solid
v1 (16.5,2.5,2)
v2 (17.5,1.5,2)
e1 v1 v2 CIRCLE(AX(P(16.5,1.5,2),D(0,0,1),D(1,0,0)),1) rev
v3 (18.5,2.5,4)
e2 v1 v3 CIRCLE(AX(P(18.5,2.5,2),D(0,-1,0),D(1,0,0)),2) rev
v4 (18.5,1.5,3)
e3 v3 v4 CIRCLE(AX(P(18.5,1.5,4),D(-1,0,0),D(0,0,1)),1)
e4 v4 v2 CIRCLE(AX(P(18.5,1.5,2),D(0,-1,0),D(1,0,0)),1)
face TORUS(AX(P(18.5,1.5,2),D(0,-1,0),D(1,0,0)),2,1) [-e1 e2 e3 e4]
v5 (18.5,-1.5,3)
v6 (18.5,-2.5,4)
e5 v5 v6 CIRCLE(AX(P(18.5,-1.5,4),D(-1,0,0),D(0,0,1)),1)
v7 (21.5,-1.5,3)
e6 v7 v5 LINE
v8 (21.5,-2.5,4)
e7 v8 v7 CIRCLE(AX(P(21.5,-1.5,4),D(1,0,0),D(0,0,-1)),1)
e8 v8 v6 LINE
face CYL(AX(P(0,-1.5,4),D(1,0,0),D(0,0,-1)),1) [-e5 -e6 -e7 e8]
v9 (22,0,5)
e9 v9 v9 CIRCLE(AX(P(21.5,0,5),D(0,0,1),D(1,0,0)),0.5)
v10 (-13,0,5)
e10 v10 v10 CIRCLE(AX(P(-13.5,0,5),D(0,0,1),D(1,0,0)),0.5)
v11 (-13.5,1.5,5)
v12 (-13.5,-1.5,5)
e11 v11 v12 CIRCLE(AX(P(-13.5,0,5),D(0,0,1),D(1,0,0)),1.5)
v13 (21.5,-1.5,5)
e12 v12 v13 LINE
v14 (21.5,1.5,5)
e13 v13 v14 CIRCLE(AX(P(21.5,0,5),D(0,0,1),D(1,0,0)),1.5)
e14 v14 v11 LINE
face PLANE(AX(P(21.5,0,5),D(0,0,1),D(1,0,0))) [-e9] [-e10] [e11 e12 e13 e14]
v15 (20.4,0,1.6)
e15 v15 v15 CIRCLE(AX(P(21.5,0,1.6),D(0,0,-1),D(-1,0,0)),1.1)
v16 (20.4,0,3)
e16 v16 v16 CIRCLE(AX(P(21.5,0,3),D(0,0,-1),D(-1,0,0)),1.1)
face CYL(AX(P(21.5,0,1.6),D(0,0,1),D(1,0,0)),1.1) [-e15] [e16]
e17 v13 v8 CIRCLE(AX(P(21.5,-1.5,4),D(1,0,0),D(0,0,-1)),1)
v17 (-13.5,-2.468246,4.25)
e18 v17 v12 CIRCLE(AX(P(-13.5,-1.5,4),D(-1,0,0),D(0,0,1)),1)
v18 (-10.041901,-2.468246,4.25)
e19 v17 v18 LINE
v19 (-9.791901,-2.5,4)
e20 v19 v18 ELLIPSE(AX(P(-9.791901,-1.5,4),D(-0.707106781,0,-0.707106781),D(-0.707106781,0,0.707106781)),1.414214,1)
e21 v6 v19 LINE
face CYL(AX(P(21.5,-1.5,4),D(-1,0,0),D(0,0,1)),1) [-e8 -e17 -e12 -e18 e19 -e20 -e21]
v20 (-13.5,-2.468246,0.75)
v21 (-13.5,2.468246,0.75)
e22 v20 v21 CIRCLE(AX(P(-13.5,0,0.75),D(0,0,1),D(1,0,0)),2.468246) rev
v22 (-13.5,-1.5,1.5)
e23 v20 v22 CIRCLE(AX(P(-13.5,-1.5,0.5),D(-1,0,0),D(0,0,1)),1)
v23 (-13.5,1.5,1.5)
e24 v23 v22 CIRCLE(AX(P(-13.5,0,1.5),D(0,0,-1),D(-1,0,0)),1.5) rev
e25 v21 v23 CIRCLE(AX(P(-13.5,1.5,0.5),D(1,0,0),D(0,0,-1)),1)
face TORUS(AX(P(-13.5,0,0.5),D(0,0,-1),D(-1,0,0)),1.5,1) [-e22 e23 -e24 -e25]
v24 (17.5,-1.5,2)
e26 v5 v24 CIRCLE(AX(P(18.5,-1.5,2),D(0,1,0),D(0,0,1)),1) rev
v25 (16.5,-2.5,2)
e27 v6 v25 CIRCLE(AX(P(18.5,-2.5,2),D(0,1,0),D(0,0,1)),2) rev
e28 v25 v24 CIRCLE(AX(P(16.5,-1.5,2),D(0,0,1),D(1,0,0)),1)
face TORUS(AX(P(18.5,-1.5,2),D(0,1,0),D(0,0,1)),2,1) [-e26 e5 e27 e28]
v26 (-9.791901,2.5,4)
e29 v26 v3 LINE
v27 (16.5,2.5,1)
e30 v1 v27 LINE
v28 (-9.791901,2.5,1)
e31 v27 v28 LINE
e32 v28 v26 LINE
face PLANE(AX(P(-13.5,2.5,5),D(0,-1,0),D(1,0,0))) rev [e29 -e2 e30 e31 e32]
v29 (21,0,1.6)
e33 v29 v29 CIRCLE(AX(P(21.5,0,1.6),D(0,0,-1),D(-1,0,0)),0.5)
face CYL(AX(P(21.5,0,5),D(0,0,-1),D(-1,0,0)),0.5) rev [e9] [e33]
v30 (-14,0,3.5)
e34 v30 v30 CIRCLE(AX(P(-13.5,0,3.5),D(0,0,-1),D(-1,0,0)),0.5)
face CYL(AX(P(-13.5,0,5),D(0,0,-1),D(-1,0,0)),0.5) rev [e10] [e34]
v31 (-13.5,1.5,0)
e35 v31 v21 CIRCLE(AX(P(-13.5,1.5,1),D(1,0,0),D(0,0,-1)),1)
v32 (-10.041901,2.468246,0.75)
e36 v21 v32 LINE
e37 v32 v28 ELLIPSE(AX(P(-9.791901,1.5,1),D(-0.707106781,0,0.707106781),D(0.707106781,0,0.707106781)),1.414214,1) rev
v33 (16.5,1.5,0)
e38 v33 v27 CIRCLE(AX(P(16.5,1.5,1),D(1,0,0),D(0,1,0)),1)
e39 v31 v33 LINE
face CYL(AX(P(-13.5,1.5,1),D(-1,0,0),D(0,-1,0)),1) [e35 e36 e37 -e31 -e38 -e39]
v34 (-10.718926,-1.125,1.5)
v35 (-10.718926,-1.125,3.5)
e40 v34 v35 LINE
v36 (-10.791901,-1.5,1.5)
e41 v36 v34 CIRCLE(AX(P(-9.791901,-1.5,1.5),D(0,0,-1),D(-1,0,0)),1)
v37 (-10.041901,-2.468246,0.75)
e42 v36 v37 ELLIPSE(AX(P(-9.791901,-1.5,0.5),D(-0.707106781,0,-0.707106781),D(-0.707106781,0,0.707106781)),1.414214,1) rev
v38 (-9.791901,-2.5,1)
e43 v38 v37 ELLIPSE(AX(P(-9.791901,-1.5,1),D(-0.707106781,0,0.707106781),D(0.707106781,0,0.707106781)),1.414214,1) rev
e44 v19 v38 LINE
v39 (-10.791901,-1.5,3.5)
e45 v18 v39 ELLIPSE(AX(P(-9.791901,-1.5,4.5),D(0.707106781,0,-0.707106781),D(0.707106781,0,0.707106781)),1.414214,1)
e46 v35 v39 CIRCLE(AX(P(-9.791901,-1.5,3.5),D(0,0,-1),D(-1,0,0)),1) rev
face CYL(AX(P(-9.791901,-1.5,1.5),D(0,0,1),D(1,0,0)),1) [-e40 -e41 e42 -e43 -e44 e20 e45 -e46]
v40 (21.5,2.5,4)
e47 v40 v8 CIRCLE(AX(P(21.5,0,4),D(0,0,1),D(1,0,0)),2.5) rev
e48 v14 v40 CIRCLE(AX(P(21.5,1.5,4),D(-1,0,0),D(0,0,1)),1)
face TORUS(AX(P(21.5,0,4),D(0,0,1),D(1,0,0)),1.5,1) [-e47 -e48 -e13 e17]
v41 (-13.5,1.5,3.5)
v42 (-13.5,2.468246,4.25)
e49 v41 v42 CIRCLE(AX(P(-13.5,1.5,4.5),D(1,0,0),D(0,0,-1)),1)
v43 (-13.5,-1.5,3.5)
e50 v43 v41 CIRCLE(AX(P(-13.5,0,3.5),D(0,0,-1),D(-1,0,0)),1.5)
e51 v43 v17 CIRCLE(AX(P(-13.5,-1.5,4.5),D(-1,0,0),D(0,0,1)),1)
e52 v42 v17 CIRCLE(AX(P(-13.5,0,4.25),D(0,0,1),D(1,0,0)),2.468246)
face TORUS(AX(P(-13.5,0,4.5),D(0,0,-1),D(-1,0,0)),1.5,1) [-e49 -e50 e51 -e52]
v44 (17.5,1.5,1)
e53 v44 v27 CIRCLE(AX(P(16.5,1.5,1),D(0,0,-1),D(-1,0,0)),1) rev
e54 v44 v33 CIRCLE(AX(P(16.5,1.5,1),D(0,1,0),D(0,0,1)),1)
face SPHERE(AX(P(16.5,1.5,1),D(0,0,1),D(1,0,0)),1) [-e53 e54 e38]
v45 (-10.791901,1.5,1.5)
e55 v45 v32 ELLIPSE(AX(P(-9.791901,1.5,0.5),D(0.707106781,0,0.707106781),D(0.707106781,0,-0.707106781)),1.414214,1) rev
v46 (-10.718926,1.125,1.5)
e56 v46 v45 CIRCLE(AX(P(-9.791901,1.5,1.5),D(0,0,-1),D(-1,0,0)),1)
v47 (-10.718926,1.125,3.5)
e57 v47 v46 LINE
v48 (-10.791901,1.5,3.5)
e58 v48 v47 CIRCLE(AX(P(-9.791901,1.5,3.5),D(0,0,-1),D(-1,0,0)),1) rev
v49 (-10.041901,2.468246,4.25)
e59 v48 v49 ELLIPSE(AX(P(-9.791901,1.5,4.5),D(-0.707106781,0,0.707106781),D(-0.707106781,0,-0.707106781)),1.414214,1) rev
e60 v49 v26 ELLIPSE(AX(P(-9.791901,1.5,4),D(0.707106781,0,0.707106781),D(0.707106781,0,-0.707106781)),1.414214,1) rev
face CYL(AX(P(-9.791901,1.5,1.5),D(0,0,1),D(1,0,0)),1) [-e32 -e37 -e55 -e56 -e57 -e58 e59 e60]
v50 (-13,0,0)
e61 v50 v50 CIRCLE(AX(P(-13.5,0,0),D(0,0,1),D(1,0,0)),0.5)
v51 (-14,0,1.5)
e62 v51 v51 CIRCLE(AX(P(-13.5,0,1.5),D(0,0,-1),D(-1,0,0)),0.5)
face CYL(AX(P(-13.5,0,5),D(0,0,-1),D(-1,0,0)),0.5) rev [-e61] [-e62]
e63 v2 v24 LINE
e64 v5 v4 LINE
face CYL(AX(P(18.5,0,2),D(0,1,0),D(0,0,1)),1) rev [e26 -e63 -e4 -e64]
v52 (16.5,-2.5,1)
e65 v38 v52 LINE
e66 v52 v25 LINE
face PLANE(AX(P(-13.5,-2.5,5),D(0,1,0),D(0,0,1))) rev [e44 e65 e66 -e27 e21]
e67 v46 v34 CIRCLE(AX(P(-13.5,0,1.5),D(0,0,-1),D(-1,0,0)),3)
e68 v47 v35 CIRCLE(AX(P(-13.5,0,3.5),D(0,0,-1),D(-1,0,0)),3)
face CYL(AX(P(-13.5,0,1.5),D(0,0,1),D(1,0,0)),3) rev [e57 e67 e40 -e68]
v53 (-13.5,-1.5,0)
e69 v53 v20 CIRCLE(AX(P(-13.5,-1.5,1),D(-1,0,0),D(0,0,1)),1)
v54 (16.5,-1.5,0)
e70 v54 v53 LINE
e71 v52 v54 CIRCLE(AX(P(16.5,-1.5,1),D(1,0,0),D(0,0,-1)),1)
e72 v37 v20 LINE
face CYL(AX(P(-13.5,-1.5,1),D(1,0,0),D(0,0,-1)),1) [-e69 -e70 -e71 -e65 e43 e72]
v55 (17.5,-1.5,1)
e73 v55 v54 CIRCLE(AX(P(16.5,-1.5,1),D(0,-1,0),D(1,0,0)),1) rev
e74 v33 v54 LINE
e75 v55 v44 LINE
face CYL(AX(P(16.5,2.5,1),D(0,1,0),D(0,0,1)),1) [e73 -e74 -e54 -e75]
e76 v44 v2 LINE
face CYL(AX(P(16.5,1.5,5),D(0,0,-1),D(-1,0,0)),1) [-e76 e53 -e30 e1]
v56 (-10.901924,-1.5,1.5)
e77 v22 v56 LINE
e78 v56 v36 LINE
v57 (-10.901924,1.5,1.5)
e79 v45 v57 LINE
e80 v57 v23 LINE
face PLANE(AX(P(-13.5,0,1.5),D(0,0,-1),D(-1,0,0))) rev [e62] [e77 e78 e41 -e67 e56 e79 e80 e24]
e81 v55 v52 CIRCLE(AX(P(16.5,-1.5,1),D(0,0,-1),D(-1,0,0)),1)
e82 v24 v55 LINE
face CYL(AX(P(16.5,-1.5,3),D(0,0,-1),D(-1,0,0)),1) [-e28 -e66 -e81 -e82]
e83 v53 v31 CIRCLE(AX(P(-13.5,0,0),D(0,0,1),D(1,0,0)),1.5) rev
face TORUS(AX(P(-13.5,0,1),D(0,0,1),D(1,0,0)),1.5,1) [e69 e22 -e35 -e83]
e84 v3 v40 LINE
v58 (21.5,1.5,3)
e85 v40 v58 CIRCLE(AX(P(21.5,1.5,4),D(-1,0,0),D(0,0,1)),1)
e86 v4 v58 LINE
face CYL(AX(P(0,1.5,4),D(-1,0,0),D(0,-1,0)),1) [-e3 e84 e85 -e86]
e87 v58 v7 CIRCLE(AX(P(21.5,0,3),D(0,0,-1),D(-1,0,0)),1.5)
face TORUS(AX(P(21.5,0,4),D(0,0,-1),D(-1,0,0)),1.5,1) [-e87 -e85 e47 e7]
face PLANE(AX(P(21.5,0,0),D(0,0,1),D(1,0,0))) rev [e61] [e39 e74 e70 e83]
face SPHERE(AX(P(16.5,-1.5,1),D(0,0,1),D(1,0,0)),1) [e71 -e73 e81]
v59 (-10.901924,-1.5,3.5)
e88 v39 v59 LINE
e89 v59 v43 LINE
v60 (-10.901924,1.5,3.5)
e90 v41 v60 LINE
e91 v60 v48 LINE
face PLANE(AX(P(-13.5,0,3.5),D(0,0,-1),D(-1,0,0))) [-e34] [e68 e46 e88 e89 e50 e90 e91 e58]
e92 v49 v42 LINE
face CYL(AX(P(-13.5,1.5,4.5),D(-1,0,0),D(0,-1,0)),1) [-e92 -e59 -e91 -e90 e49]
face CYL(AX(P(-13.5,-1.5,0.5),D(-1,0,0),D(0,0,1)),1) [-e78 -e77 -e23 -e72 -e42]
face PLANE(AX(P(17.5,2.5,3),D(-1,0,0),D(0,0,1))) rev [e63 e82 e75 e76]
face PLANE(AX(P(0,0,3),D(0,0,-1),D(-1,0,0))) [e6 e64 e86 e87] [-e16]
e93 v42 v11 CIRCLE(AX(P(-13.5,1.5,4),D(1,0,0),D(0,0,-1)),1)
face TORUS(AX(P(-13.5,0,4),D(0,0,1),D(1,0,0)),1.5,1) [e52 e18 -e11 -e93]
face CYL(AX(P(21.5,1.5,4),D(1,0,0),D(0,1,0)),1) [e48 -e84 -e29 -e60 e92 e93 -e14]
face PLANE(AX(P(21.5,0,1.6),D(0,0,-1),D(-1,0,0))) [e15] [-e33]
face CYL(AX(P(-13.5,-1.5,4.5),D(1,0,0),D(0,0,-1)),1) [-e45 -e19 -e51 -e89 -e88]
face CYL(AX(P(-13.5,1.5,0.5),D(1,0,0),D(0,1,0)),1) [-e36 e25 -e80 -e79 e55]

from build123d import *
from build123d.topology import SkipClean

# Parameters (mm, degrees)
SKETCH_1_R               = 0.5
EXTRUDE_1_DEPTH          = 5
CUT_EXTRUDE_1_DEPTH      = 1
CUT_EXTRUDE_1_DEPTH_BACK = 1
CUT_EXTRUDE_1_START      = -2.5
SKETCH_2_R               = 3
SKETCH_7_W               = 8
SKETCH_7_H               = 5
CUT_EXTRUDE_3_DEPTH      = 3
EXTRUDE_START            = 1.4
SKETCH_8_R               = 1.1
SKETCH_8_R_2             = 0.5
EXTRUDE_3_DEPTH          = 1.4
FILLET_1_R               = 1


with BuildPart() as part:
    # 草图1 → 凸台-拉伸1 (new body)
    with BuildSketch(Plane.XY):
        with BuildLine():
            Line((-13.5, 2.5), (21.5, 2.5))
            ThreePointArc((21.5, 2.5), (24, 0), (21.5, -2.5))
            Line((21.5, -2.5), (-13.5, -2.5))
            ThreePointArc((-13.5, -2.5), (-16, 0), (-13.5, 2.5))
        make_face()
        with Locations((-13.5, 0)):
            Circle(SKETCH_1_R, mode=Mode.SUBTRACT)
        with Locations((21.5, 0)):
            Circle(SKETCH_1_R, mode=Mode.SUBTRACT)
    extrude(amount=EXTRUDE_1_DEPTH)

    # 草图2 → 切除-拉伸1 (cut, two sides: drawn at the far end of the back side and taken through both)
    with BuildSketch(Plane(origin=(0, 0, 0), x_dir=(-1, 0, 0), z_dir=(0, 0, -1)).offset(CUT_EXTRUDE_1_START - CUT_EXTRUDE_1_DEPTH_BACK)):
        with Locations((13.5, 0)):
            Circle(SKETCH_2_R)
    extrude(amount=CUT_EXTRUDE_1_DEPTH + CUT_EXTRUDE_1_DEPTH_BACK, mode=Mode.SUBTRACT)

    # 草图7 → 切除-拉伸3 (cut)
    with BuildSketch(Plane(origin=(0, 0, 0), x_dir=(-1, 0, 0), z_dir=(0, 0, -1))):
        with Locations((-21.5, 0)):
            Rectangle(SKETCH_7_W, SKETCH_7_H)
    extrude(amount=-CUT_EXTRUDE_3_DEPTH, mode=Mode.SUBTRACT)

    # 草图8 → 凸台-拉伸3 (add)
    with SkipClean():  # the faces are left unmerged after this step: merging them gives an invalid solid
        with BuildSketch(Plane(origin=(0, 0, 3), x_dir=(-1, 0, 0), z_dir=(0, 0, -1)).offset(EXTRUDE_START)):
            with Locations((-21.5, 0)):
                Circle(SKETCH_8_R)
            with Locations((-21.5, 0)):
                Circle(SKETCH_8_R_2, mode=Mode.SUBTRACT)
        extrude(amount=-EXTRUDE_3_DEPTH)

    # 圆角1
    # the kernel refuses this fillet: 1 mm, written as the material it adds along each edge
    with BuildSketch(Plane(origin=(17.5, 2.5, 3), x_dir=(1, 0, 0), z_dir=(0, -1, 0))) as fillet_1_piece_1:
        with BuildLine():
            CenterArc((FILLET_1_R, -FILLET_1_R), FILLET_1_R, 90, 90)
            Line((0, -FILLET_1_R), (-FILLET_1_R * 0.02, -FILLET_1_R))
            Line((-FILLET_1_R * 0.02, -FILLET_1_R), (-FILLET_1_R * 0.02, FILLET_1_R * 0.02))
            Line((-FILLET_1_R * 0.02, FILLET_1_R * 0.02), (FILLET_1_R, FILLET_1_R * 0.02))
            Line((FILLET_1_R, FILLET_1_R * 0.02), (FILLET_1_R, 0))
        make_face()
    extrude(amount=5)
    # the kernel refuses this fillet: 1 mm, written as the material it takes off along each edge
    with BuildSketch(Plane(origin=(-13.5, -2.5, 1.5), x_dir=(0, 0, -1), z_dir=(1, 0, 0))) as fillet_1_2_piece_1_section:
        with BuildLine():
            CenterArc((FILLET_1_R, FILLET_1_R), FILLET_1_R, 180, 90)
            Line((0, FILLET_1_R), (-FILLET_1_R * 0.02, FILLET_1_R))
            Line((-FILLET_1_R * 0.02, FILLET_1_R), (-FILLET_1_R * 0.02, -FILLET_1_R * 0.02))
            Line((-FILLET_1_R * 0.02, -FILLET_1_R * 0.02), (FILLET_1_R, -FILLET_1_R * 0.02))
            Line((FILLET_1_R, -FILLET_1_R * 0.02), (FILLET_1_R, 0))
        make_face()
    fillet_1_2_piece_1 = extrude(amount=4.158312395, mode=Mode.PRIVATE)
    fillet_1_2_piece_1 = fillet_1_2_piece_1 & Plane(origin=(-13.5, 0, 1.28947416), x_dir=(-1, 0, 0), z_dir=(0, 0, -1)) * Cylinder(3, 13, mode=Mode.PRIVATE)
    add(fillet_1_2_piece_1, mode=Mode.SUBTRACT)
    with BuildSketch(Plane(origin=(-9.341687605, 2.5, 1.5), x_dir=(0, 0, -1), z_dir=(-1, 0, 0))) as fillet_1_2_piece_2_section:
        with BuildLine():
            CenterArc((FILLET_1_R, FILLET_1_R), FILLET_1_R, 180, 90)
            Line((0, FILLET_1_R), (-FILLET_1_R * 0.02, FILLET_1_R))
            Line((-FILLET_1_R * 0.02, FILLET_1_R), (-FILLET_1_R * 0.02, -FILLET_1_R * 0.02))
            Line((-FILLET_1_R * 0.02, -FILLET_1_R * 0.02), (FILLET_1_R, -FILLET_1_R * 0.02))
            Line((FILLET_1_R, -FILLET_1_R * 0.02), (FILLET_1_R, 0))
        make_face()
    fillet_1_2_piece_2 = extrude(amount=4.158312395, mode=Mode.PRIVATE)
    fillet_1_2_piece_2 = fillet_1_2_piece_2 & Plane(origin=(-13.5, 0, 1.289475039), x_dir=(-1, 0, 0), z_dir=(0, 0, -1)) * Cylinder(3, 13, mode=Mode.PRIVATE)
    add(fillet_1_2_piece_2, mode=Mode.SUBTRACT)
    with BuildSketch(Plane(origin=(-13.5, -2.5, 3.5), x_dir=(0, 0, 1), z_dir=(1, 0, 0))) as fillet_1_2_piece_3_section:
        with BuildLine():
            CenterArc((FILLET_1_R, -FILLET_1_R), FILLET_1_R, 90, 90)
            Line((0, -FILLET_1_R), (-FILLET_1_R * 0.02, -FILLET_1_R))
            Line((-FILLET_1_R * 0.02, -FILLET_1_R), (-FILLET_1_R * 0.02, FILLET_1_R * 0.02))
            Line((-FILLET_1_R * 0.02, FILLET_1_R * 0.02), (FILLET_1_R, FILLET_1_R * 0.02))
            Line((FILLET_1_R, FILLET_1_R * 0.02), (FILLET_1_R, 0))
        make_face()
    fillet_1_2_piece_3 = extrude(amount=4.158312395, mode=Mode.PRIVATE)
    fillet_1_2_piece_3 = fillet_1_2_piece_3 & Plane(origin=(-13.5, 0, 3.71052584), x_dir=(-1, 0, 0), z_dir=(0, 0, -1)) * Cylinder(3, 13, mode=Mode.PRIVATE)
    add(fillet_1_2_piece_3, mode=Mode.SUBTRACT)
    with BuildSketch(Plane(origin=(-9.341687605, 2.5, 3.5), x_dir=(0, 0, 1), z_dir=(-1, 0, 0))) as fillet_1_2_piece_4_section:
        with BuildLine():
            CenterArc((FILLET_1_R, -FILLET_1_R), FILLET_1_R, 90, 90)
            Line((0, -FILLET_1_R), (-FILLET_1_R * 0.02, -FILLET_1_R))
            Line((-FILLET_1_R * 0.02, -FILLET_1_R), (-FILLET_1_R * 0.02, FILLET_1_R * 0.02))
            Line((-FILLET_1_R * 0.02, FILLET_1_R * 0.02), (FILLET_1_R, FILLET_1_R * 0.02))
            Line((FILLET_1_R, FILLET_1_R * 0.02), (FILLET_1_R, 0))
        make_face()
    fillet_1_2_piece_4 = extrude(amount=4.158312395, mode=Mode.PRIVATE)
    fillet_1_2_piece_4 = fillet_1_2_piece_4 & Plane(origin=(-13.5, 0, 3.710524961), x_dir=(-1, 0, 0), z_dir=(0, 0, -1)) * Cylinder(3, 13, mode=Mode.PRIVATE)
    add(fillet_1_2_piece_4, mode=Mode.SUBTRACT)
    with BuildSketch(Plane(origin=(-13.5, 0, 5), x_dir=(0, -1, 0), z_dir=(1, 0, 0))) as fillet_1_2_piece_5:
        with BuildLine():
            CenterArc((2.5 - FILLET_1_R, FILLET_1_R), FILLET_1_R, 270, 90)
            Line((2.5, FILLET_1_R), (2.5 + FILLET_1_R * 0.02, FILLET_1_R))
            Line((2.5 + FILLET_1_R * 0.02, FILLET_1_R), (2.5 + FILLET_1_R * 0.02, -FILLET_1_R * 0.02))
            Line((2.5 + FILLET_1_R * 0.02, -FILLET_1_R * 0.02), (2.5 - FILLET_1_R, -FILLET_1_R * 0.02))
            Line((2.5 - FILLET_1_R, -FILLET_1_R * 0.02), (2.5 - FILLET_1_R, 0))
        make_face()
    revolve(axis=Axis((-13.5, 0, 5), (0, 0, -1)), revolution_arc=180, mode=Mode.SUBTRACT)
    with BuildSketch(Plane(origin=(-13.5, 2.5, 5), x_dir=(0, -1, 0), z_dir=(1, 0, 0))) as fillet_1_2_piece_6:
        with BuildLine():
            CenterArc((FILLET_1_R, FILLET_1_R), FILLET_1_R, 180, 90)
            Line((0, FILLET_1_R), (-FILLET_1_R * 0.02, FILLET_1_R))
            Line((-FILLET_1_R * 0.02, FILLET_1_R), (-FILLET_1_R * 0.02, -FILLET_1_R * 0.02))
            Line((-FILLET_1_R * 0.02, -FILLET_1_R * 0.02), (FILLET_1_R, -FILLET_1_R * 0.02))
            Line((FILLET_1_R, -FILLET_1_R * 0.02), (FILLET_1_R, 0))
        make_face()
    extrude(amount=35, mode=Mode.SUBTRACT)
    with BuildSketch(Plane(origin=(21.5, 0, 5), x_dir=(0, 1, 0), z_dir=(-1, 0, 0))) as fillet_1_2_piece_7:
        with BuildLine():
            CenterArc((2.5 - FILLET_1_R, FILLET_1_R), FILLET_1_R, 270, 90)
            Line((2.5 - FILLET_1_R, 0), (2.5 - FILLET_1_R, -FILLET_1_R * 0.02))
            Line((2.5 - FILLET_1_R, -FILLET_1_R * 0.02), (2.5 + FILLET_1_R * 0.02, -FILLET_1_R * 0.02))
            Line((2.5 + FILLET_1_R * 0.02, -FILLET_1_R * 0.02), (2.5 + FILLET_1_R * 0.02, FILLET_1_R))
            Line((2.5 + FILLET_1_R * 0.02, FILLET_1_R), (2.5, FILLET_1_R))
        make_face()
    revolve(axis=Axis((21.5, 0, 5), (0, 0, -1)), revolution_arc=180, mode=Mode.SUBTRACT)
    with BuildSketch(Plane(origin=(-13.5, 2.5, 0), x_dir=(0, 0, 1), z_dir=(1, 0, 0)), Plane(origin=(17.5, -2.5, 0), x_dir=(0, 0, 1), z_dir=(-1, 0, 0))) as fillet_1_2_piece_8:
        with BuildLine():
            CenterArc((FILLET_1_R, FILLET_1_R), FILLET_1_R, 180, 90)
            Line((0, FILLET_1_R), (-FILLET_1_R * 0.02, FILLET_1_R))
            Line((-FILLET_1_R * 0.02, FILLET_1_R), (-FILLET_1_R * 0.02, -FILLET_1_R * 0.02))
            Line((-FILLET_1_R * 0.02, -FILLET_1_R * 0.02), (FILLET_1_R, -FILLET_1_R * 0.02))
            Line((FILLET_1_R, -FILLET_1_R * 0.02), (FILLET_1_R, 0))
        make_face()
    extrude(amount=31, mode=Mode.SUBTRACT)
    with BuildSketch(Plane(origin=(-13.5, 0, 0), x_dir=(0, -1, 0), z_dir=(1, 0, 0))) as fillet_1_2_piece_9:
        with BuildLine():
            CenterArc((2.5 - FILLET_1_R, -FILLET_1_R), FILLET_1_R, 0, 90)
            Line((2.5, -FILLET_1_R), (2.5 + FILLET_1_R * 0.02, -FILLET_1_R))
            Line((2.5 + FILLET_1_R * 0.02, -FILLET_1_R), (2.5 + FILLET_1_R * 0.02, FILLET_1_R * 0.02))
            Line((2.5 + FILLET_1_R * 0.02, FILLET_1_R * 0.02), (2.5 - FILLET_1_R, FILLET_1_R * 0.02))
            Line((2.5 - FILLET_1_R, FILLET_1_R * 0.02), (2.5 - FILLET_1_R, 0))
        make_face()
    revolve(axis=Axis((-13.5, 0, 0), (0, 0, -1)), revolution_arc=180, mode=Mode.SUBTRACT)
    with BuildSketch(Plane(origin=(-13.5, 0, 1.5), x_dir=(0, -1, 0), z_dir=(1, 0, 0))) as fillet_1_2_piece_10:
        with BuildLine():
            CenterArc((2.5 - FILLET_1_R, FILLET_1_R), FILLET_1_R, 270, 90)
            Line((2.5 - FILLET_1_R, 0), (2.5 - FILLET_1_R, -FILLET_1_R * 0.02))
            Line((2.5 - FILLET_1_R, -FILLET_1_R * 0.02), (2.5 + FILLET_1_R * 0.02, -FILLET_1_R * 0.02))
            Line((2.5 + FILLET_1_R * 0.02, -FILLET_1_R * 0.02), (2.5 + FILLET_1_R * 0.02, FILLET_1_R))
            Line((2.5 + FILLET_1_R * 0.02, FILLET_1_R), (2.5, FILLET_1_R))
        make_face()
    revolve(axis=Axis((-13.5, 0, 1.5), (0, 0, -1)), revolution_arc=180, mode=Mode.SUBTRACT)
    with BuildSketch(Plane(origin=(-13.5, 0, 3.5), x_dir=(0, -1, 0), z_dir=(1, 0, 0))) as fillet_1_2_piece_11:
        with BuildLine():
            CenterArc((2.5 - FILLET_1_R, -FILLET_1_R), FILLET_1_R, 0, 90)
            Line((2.5, -FILLET_1_R), (2.5 + FILLET_1_R * 0.02, -FILLET_1_R))
            Line((2.5 + FILLET_1_R * 0.02, -FILLET_1_R), (2.5 + FILLET_1_R * 0.02, FILLET_1_R * 0.02))
            Line((2.5 + FILLET_1_R * 0.02, FILLET_1_R * 0.02), (2.5 - FILLET_1_R, FILLET_1_R * 0.02))
            Line((2.5 - FILLET_1_R, FILLET_1_R * 0.02), (2.5 - FILLET_1_R, 0))
        make_face()
    revolve(axis=Axis((-13.5, 0, 3.5), (0, 0, -1)), revolution_arc=180, mode=Mode.SUBTRACT)
    with BuildSketch(Plane(origin=(-11.841687605, 2.5, 1.5), x_dir=(1, 0, 0), z_dir=(0, 0, 1)), Plane(origin=(-11.841687605, -2.5, 3.5), x_dir=(1, 0, 0), z_dir=(0, 0, -1))) as fillet_1_2_piece_12:
        with BuildLine():
            CenterArc((2.049786848, -1), FILLET_1_R, 90, 112.024312837)
            Line((1.122762037, -1.375), (1.104221541, -1.3825))
            ThreePointArc((1.104221541, -1.3825), (0.649920512, -0.615202704), (-0.011055416, -0.016666667))
            Line((-0.011055416, -0.016666667), (0, 0.02))
            Line((0, 0.02), (2.049786848, 0.02))
            Line((2.049786848, 0.02), (2.049786848, 0))
        make_face()
    extrude(amount=2, mode=Mode.SUBTRACT)
    with BuildSketch(Plane(origin=(21.5, -2.5, 5), x_dir=(0, 0, -1), z_dir=(-1, 0, 0))) as fillet_1_2_piece_13:
        with BuildLine():
            CenterArc((FILLET_1_R, -FILLET_1_R), FILLET_1_R, 90, 90)
            Line((0, -FILLET_1_R), (-FILLET_1_R * 0.02, -FILLET_1_R))
            Line((-FILLET_1_R * 0.02, -FILLET_1_R), (-FILLET_1_R * 0.02, FILLET_1_R * 0.02))
            Line((-FILLET_1_R * 0.02, FILLET_1_R * 0.02), (FILLET_1_R, FILLET_1_R * 0.02))
            Line((FILLET_1_R, FILLET_1_R * 0.02), (FILLET_1_R, 0))
        make_face()
    extrude(amount=35, mode=Mode.SUBTRACT)
    with BuildSketch(Plane(origin=(17.5, 2.5, 0), x_dir=(-1, 0, 0), z_dir=(0, -1, 0))) as fillet_1_2_piece_14:
        with BuildLine():
            CenterArc((FILLET_1_R, -FILLET_1_R), FILLET_1_R, 90, 90)
            Line((0, -FILLET_1_R), (-FILLET_1_R * 0.02, -FILLET_1_R))
            Line((-FILLET_1_R * 0.02, -FILLET_1_R), (-FILLET_1_R * 0.02, FILLET_1_R * 0.02))
            Line((-FILLET_1_R * 0.02, FILLET_1_R * 0.02), (FILLET_1_R, FILLET_1_R * 0.02))
            Line((FILLET_1_R, FILLET_1_R * 0.02), (FILLET_1_R, 0))
        make_face()
    extrude(amount=5, mode=Mode.SUBTRACT)
    with BuildSketch(Plane(origin=(-13.5, -2.5, 1.5), x_dir=(0, 0, -1), z_dir=(1, 0, 0))) as fillet_1_2_piece_15a_section:
        with BuildLine():
            CenterArc((FILLET_1_R, FILLET_1_R), FILLET_1_R, 180, 90)
            Line((0, FILLET_1_R), (-FILLET_1_R * 0.02, FILLET_1_R))
            Line((-FILLET_1_R * 0.02, FILLET_1_R), (-FILLET_1_R * 0.02, -FILLET_1_R * 0.02))
            Line((-FILLET_1_R * 0.02, -FILLET_1_R * 0.02), (FILLET_1_R, -FILLET_1_R * 0.02))
            Line((FILLET_1_R, -FILLET_1_R * 0.02), (FILLET_1_R, 0))
        make_face()
    fillet_1_2_piece_15a = extrude(amount=4.158312395, mode=Mode.PRIVATE)
    fillet_1_2_piece_15a = fillet_1_2_piece_15a - Plane(origin=(-13.5, 0, 1.259839383), x_dir=(-1, 0, 0), z_dir=(0, 0, -1)) * Cylinder(3, 13, mode=Mode.PRIVATE)
    with BuildSketch(Plane(origin=(-11.841687605, -2.5, 3.5), x_dir=(1, 0, 0), z_dir=(0, 0, -1))) as fillet_1_2_piece_15b_section:
        with BuildLine():
            CenterArc((2.049786848, -1), FILLET_1_R, 90, 112.024312837)
            Line((1.122762037, -1.375), (1.104221541, -1.3825))
            ThreePointArc((1.104221541, -1.3825), (0.649920512, -0.615202704), (-0.011055416, -0.016666667))
            Line((-0.011055416, -0.016666667), (0, 0.02))
            Line((0, 0.02), (2.049786848, 0.02))
            Line((2.049786848, 0.02), (2.049786848, 0))
        make_face()
    fillet_1_2_piece_15b = extrude(amount=7.124467121, mode=Mode.PRIVATE)
    fillet_1_2_piece_15b = split(fillet_1_2_piece_15b, bisect_by=Plane(origin=(-10.955873781, -2.177051109, 1.5), z_dir=(0, 0, -1)), keep=Keep.TOP, mode=Mode.PRIVATE)
    fillet_1_2_piece_15 = fillet_1_2_piece_15a & fillet_1_2_piece_15b
    add(fillet_1_2_piece_15, mode=Mode.SUBTRACT)
    with BuildSketch(Plane(origin=(-11.841687605, 2.5, -3.624467121), x_dir=(1, 0, 0), z_dir=(0, 0, 1))) as fillet_1_2_piece_16a_section:
        with BuildLine():
            CenterArc((2.049786848, -1), FILLET_1_R, 90, 112.024312837)
            Line((1.122762037, -1.375), (1.104221541, -1.3825))
            ThreePointArc((1.104221541, -1.3825), (0.649920512, -0.615202704), (-0.011055416, -0.016666667))
            Line((-0.011055416, -0.016666667), (0, 0.02))
            Line((0, 0.02), (2.049786848, 0.02))
            Line((2.049786848, 0.02), (2.049786848, 0))
        make_face()
    fillet_1_2_piece_16a = extrude(amount=7.124467121, mode=Mode.PRIVATE)
    fillet_1_2_piece_16a = split(fillet_1_2_piece_16a, bisect_by=Plane(origin=(-10.955873781, 2.177051109, 1.5), z_dir=(0, 0, -1)), keep=Keep.TOP, mode=Mode.PRIVATE)
    with BuildSketch(Plane(origin=(-9.341687605, 2.5, 1.5), x_dir=(0, 0, -1), z_dir=(-1, 0, 0))) as fillet_1_2_piece_16b_section:
        with BuildLine():
            CenterArc((FILLET_1_R, FILLET_1_R), FILLET_1_R, 180, 90)
            Line((0, FILLET_1_R), (-FILLET_1_R * 0.02, FILLET_1_R))
            Line((-FILLET_1_R * 0.02, FILLET_1_R), (-FILLET_1_R * 0.02, -FILLET_1_R * 0.02))
            Line((-FILLET_1_R * 0.02, -FILLET_1_R * 0.02), (FILLET_1_R, -FILLET_1_R * 0.02))
            Line((FILLET_1_R, -FILLET_1_R * 0.02), (FILLET_1_R, 0))
        make_face()
    fillet_1_2_piece_16b = extrude(amount=4.158312395, mode=Mode.PRIVATE)
    fillet_1_2_piece_16b = fillet_1_2_piece_16b - Plane(origin=(-13.5, 0, 1.259838183), x_dir=(-1, 0, 0), z_dir=(0, 0, -1)) * Cylinder(3, 13, mode=Mode.PRIVATE)
    fillet_1_2_piece_16 = fillet_1_2_piece_16a & fillet_1_2_piece_16b
    add(fillet_1_2_piece_16, mode=Mode.SUBTRACT)
    with BuildSketch(Plane(origin=(-11.841687605, -2.5, 8.624467121), x_dir=(1, 0, 0), z_dir=(0, 0, -1))) as fillet_1_2_piece_17a_section:
        with BuildLine():
            CenterArc((2.049786848, -1), FILLET_1_R, 90, 112.024312837)
            Line((1.122762037, -1.375), (1.104221541, -1.3825))
            ThreePointArc((1.104221541, -1.3825), (0.649920512, -0.615202704), (-0.011055416, -0.016666667))
            Line((-0.011055416, -0.016666667), (0, 0.02))
            Line((0, 0.02), (2.049786848, 0.02))
            Line((2.049786848, 0.02), (2.049786848, 0))
        make_face()
    fillet_1_2_piece_17a = extrude(amount=7.124467121, mode=Mode.PRIVATE)
    fillet_1_2_piece_17a = split(fillet_1_2_piece_17a, bisect_by=Plane(origin=(-10.955873781, -2.177051109, 3.5), z_dir=(0, 0, 1)), keep=Keep.TOP, mode=Mode.PRIVATE)
    with BuildSketch(Plane(origin=(-13.5, -2.5, 3.5), x_dir=(0, 0, 1), z_dir=(1, 0, 0))) as fillet_1_2_piece_17b_section:
        with BuildLine():
            CenterArc((FILLET_1_R, -FILLET_1_R), FILLET_1_R, 90, 90)
            Line((0, -FILLET_1_R), (-FILLET_1_R * 0.02, -FILLET_1_R))
            Line((-FILLET_1_R * 0.02, -FILLET_1_R), (-FILLET_1_R * 0.02, FILLET_1_R * 0.02))
            Line((-FILLET_1_R * 0.02, FILLET_1_R * 0.02), (FILLET_1_R, FILLET_1_R * 0.02))
            Line((FILLET_1_R, FILLET_1_R * 0.02), (FILLET_1_R, 0))
        make_face()
    fillet_1_2_piece_17b = extrude(amount=4.158312395, mode=Mode.PRIVATE)
    fillet_1_2_piece_17b = fillet_1_2_piece_17b - Plane(origin=(-13.5, 0, 3.740160617), x_dir=(-1, 0, 0), z_dir=(0, 0, -1)) * Cylinder(3, 13, mode=Mode.PRIVATE)
    fillet_1_2_piece_17 = fillet_1_2_piece_17a & fillet_1_2_piece_17b
    add(fillet_1_2_piece_17, mode=Mode.SUBTRACT)
    with BuildSketch(Plane(origin=(-9.341687605, 2.5, 3.5), x_dir=(0, 0, 1), z_dir=(-1, 0, 0))) as fillet_1_2_piece_18a_section:
        with BuildLine():
            CenterArc((FILLET_1_R, -FILLET_1_R), FILLET_1_R, 90, 90)
            Line((0, -FILLET_1_R), (-FILLET_1_R * 0.02, -FILLET_1_R))
            Line((-FILLET_1_R * 0.02, -FILLET_1_R), (-FILLET_1_R * 0.02, FILLET_1_R * 0.02))
            Line((-FILLET_1_R * 0.02, FILLET_1_R * 0.02), (FILLET_1_R, FILLET_1_R * 0.02))
            Line((FILLET_1_R, FILLET_1_R * 0.02), (FILLET_1_R, 0))
        make_face()
    fillet_1_2_piece_18a = extrude(amount=4.158312395, mode=Mode.PRIVATE)
    fillet_1_2_piece_18a = fillet_1_2_piece_18a - Plane(origin=(-13.5, 0, 3.740161817), x_dir=(-1, 0, 0), z_dir=(0, 0, -1)) * Cylinder(3, 13, mode=Mode.PRIVATE)
    with BuildSketch(Plane(origin=(-11.841687605, 2.5, 1.5), x_dir=(1, 0, 0), z_dir=(0, 0, 1))) as fillet_1_2_piece_18b_section:
        with BuildLine():
            CenterArc((2.049786848, -1), FILLET_1_R, 90, 112.024312837)
            Line((1.122762037, -1.375), (1.104221541, -1.3825))
            ThreePointArc((1.104221541, -1.3825), (0.649920512, -0.615202704), (-0.011055416, -0.016666667))
            Line((-0.011055416, -0.016666667), (0, 0.02))
            Line((0, 0.02), (2.049786848, 0.02))
            Line((2.049786848, 0.02), (2.049786848, 0))
        make_face()
    fillet_1_2_piece_18b = extrude(amount=7.124467121, mode=Mode.PRIVATE)
    fillet_1_2_piece_18b = split(fillet_1_2_piece_18b, bisect_by=Plane(origin=(-10.955873781, 2.177051109, 3.5), z_dir=(0, 0, 1)), keep=Keep.TOP, mode=Mode.PRIVATE)
    fillet_1_2_piece_18 = fillet_1_2_piece_18a & fillet_1_2_piece_18b
    add(fillet_1_2_piece_18, mode=Mode.SUBTRACT)
    with BuildSketch(Plane(origin=(-13.5, 2.5, 0), x_dir=(0, 0, 1), z_dir=(1, 0, 0))) as fillet_1_2_piece_19a_section:
        with BuildLine():
            CenterArc((FILLET_1_R, FILLET_1_R), FILLET_1_R, 180, 90)
            Line((0, FILLET_1_R), (-FILLET_1_R * 0.02, FILLET_1_R))
            Line((-FILLET_1_R * 0.02, FILLET_1_R), (-FILLET_1_R * 0.02, -FILLET_1_R * 0.02))
            Line((-FILLET_1_R * 0.02, -FILLET_1_R * 0.02), (FILLET_1_R, -FILLET_1_R * 0.02))
            Line((FILLET_1_R, -FILLET_1_R * 0.02), (FILLET_1_R, 0))
        make_face()
    fillet_1_2_piece_19a = extrude(amount=33.5, mode=Mode.PRIVATE)
    fillet_1_2_piece_19a = split(fillet_1_2_piece_19a, bisect_by=Plane(origin=(17.5, 2.273604886, 0.226395114), z_dir=(1, 0, 0)), keep=Keep.TOP, mode=Mode.PRIVATE)
    with BuildSketch(Plane(origin=(17.5, 5, 0), x_dir=(-1, 0, 0), z_dir=(0, -1, 0))) as fillet_1_2_piece_19b_section:
        with BuildLine():
            CenterArc((FILLET_1_R, -FILLET_1_R), FILLET_1_R, 90, 90)
            Line((0, -FILLET_1_R), (-FILLET_1_R * 0.02, -FILLET_1_R))
            Line((-FILLET_1_R * 0.02, -FILLET_1_R), (-FILLET_1_R * 0.02, FILLET_1_R * 0.02))
            Line((-FILLET_1_R * 0.02, FILLET_1_R * 0.02), (FILLET_1_R, FILLET_1_R * 0.02))
            Line((FILLET_1_R, FILLET_1_R * 0.02), (FILLET_1_R, 0))
        make_face()
    fillet_1_2_piece_19b = extrude(amount=7.5, mode=Mode.PRIVATE)
    fillet_1_2_piece_19b = split(fillet_1_2_piece_19b, bisect_by=Plane(origin=(17.273604886, 2.5, 0.226395114), z_dir=(0, 1, 0)), keep=Keep.TOP, mode=Mode.PRIVATE)
    fillet_1_2_piece_19 = fillet_1_2_piece_19a & fillet_1_2_piece_19b
    add(fillet_1_2_piece_19, mode=Mode.SUBTRACT)
    with BuildSketch(Plane(origin=(20, -2.5, 0), x_dir=(0, 0, 1), z_dir=(-1, 0, 0))) as fillet_1_2_piece_20a_section:
        with BuildLine():
            CenterArc((FILLET_1_R, FILLET_1_R), FILLET_1_R, 180, 90)
            Line((0, FILLET_1_R), (-FILLET_1_R * 0.02, FILLET_1_R))
            Line((-FILLET_1_R * 0.02, FILLET_1_R), (-FILLET_1_R * 0.02, -FILLET_1_R * 0.02))
            Line((-FILLET_1_R * 0.02, -FILLET_1_R * 0.02), (FILLET_1_R, -FILLET_1_R * 0.02))
            Line((FILLET_1_R, -FILLET_1_R * 0.02), (FILLET_1_R, 0))
        make_face()
    fillet_1_2_piece_20a = extrude(amount=33.5, mode=Mode.PRIVATE)
    fillet_1_2_piece_20a = split(fillet_1_2_piece_20a, bisect_by=Plane(origin=(17.5, -2.273604886, 0.226395114), z_dir=(1, 0, 0)), keep=Keep.TOP, mode=Mode.PRIVATE)
    with BuildSketch(Plane(origin=(17.5, 2.5, 0), x_dir=(-1, 0, 0), z_dir=(0, -1, 0))) as fillet_1_2_piece_20b_section:
        with BuildLine():
            CenterArc((FILLET_1_R, -FILLET_1_R), FILLET_1_R, 90, 90)
            Line((0, -FILLET_1_R), (-FILLET_1_R * 0.02, -FILLET_1_R))
            Line((-FILLET_1_R * 0.02, -FILLET_1_R), (-FILLET_1_R * 0.02, FILLET_1_R * 0.02))
            Line((-FILLET_1_R * 0.02, FILLET_1_R * 0.02), (FILLET_1_R, FILLET_1_R * 0.02))
            Line((FILLET_1_R, FILLET_1_R * 0.02), (FILLET_1_R, 0))
        make_face()
    fillet_1_2_piece_20b = extrude(amount=7.5, mode=Mode.PRIVATE)
    fillet_1_2_piece_20b = split(fillet_1_2_piece_20b, bisect_by=Plane(origin=(17.273604886, -2.5, 0.226395114), z_dir=(0, -1, 0)), keep=Keep.TOP, mode=Mode.PRIVATE)
    fillet_1_2_piece_20 = fillet_1_2_piece_20a & fillet_1_2_piece_20b
    add(fillet_1_2_piece_20, mode=Mode.SUBTRACT)
    # the kernel refuses this fillet: 1 mm, written as the material it takes off along each edge
    with BuildSketch(Plane(origin=(16.5, -1.5, 1), x_dir=(1, 0, 0), z_dir=(0, -1, 0))) as fillet_1_3_piece_1_section:
        Polygon((0, 0), (FILLET_1_R * 1.02, 0), (FILLET_1_R * 1.02, -FILLET_1_R * 1.02), (0, -FILLET_1_R * 1.02), align=None)
    fillet_1_3_piece_1 = extrude(amount=FILLET_1_R * 1.02, mode=Mode.PRIVATE)
    fillet_1_3_piece_1 = fillet_1_3_piece_1 - Plane(origin=(16.5, -1.5, 1), x_dir=(-0.7071067811865475, 0, 0.7071067811865475), z_dir=(0, -1, 0)) * Sphere(FILLET_1_R, mode=Mode.PRIVATE)
    add(fillet_1_3_piece_1, mode=Mode.SUBTRACT)
    with BuildSketch(Plane(origin=(16.5, 1.5, 1), x_dir=(1, 0, 0), z_dir=(0, 1, 0))) as fillet_1_3_piece_2_section:
        Polygon((0, 0), (FILLET_1_R * 1.02, 0), (FILLET_1_R * 1.02, FILLET_1_R * 1.02), (0, FILLET_1_R * 1.02), align=None)
    fillet_1_3_piece_2 = extrude(amount=FILLET_1_R * 1.02, mode=Mode.PRIVATE)
    fillet_1_3_piece_2 = fillet_1_3_piece_2 - Plane(origin=(16.5, 1.5, 1), x_dir=(-0.7071067811865475, 0, 0.7071067811865475), z_dir=(0, 1, 0)) * Sphere(FILLET_1_R, mode=Mode.PRIVATE)
    add(fillet_1_3_piece_2, mode=Mode.SUBTRACT)
    with BuildSketch(Plane(origin=(17.5, 2.5, 1), x_dir=(-1, 0, 0), z_dir=(0, 0, 1))) as fillet_1_3_piece_3:
        with BuildLine():
            CenterArc((FILLET_1_R, FILLET_1_R), FILLET_1_R, 180, 90)
            Line((0, FILLET_1_R), (-FILLET_1_R * 0.02, FILLET_1_R))
            Line((-FILLET_1_R * 0.02, FILLET_1_R), (-FILLET_1_R * 0.02, -FILLET_1_R * 0.02))
            Line((-FILLET_1_R * 0.02, -FILLET_1_R * 0.02), (FILLET_1_R, -FILLET_1_R * 0.02))
            Line((FILLET_1_R, -FILLET_1_R * 0.02), (FILLET_1_R, 0))
        make_face()
    extrude(amount=1, mode=Mode.SUBTRACT)
    with BuildSketch(Plane(origin=(21.5, 2.5, 3), x_dir=(0, -1, 0), z_dir=(-1, 0, 0)), Plane(origin=(18.5, -2.5, 3), x_dir=(0, 1, 0), z_dir=(1, 0, 0))) as fillet_1_3_piece_4:
        with BuildLine():
            CenterArc((FILLET_1_R, FILLET_1_R), FILLET_1_R, 180, 90)
            Line((0, FILLET_1_R), (-FILLET_1_R * 0.02, FILLET_1_R))
            Line((-FILLET_1_R * 0.02, FILLET_1_R), (-FILLET_1_R * 0.02, -FILLET_1_R * 0.02))
            Line((-FILLET_1_R * 0.02, -FILLET_1_R * 0.02), (FILLET_1_R, -FILLET_1_R * 0.02))
            Line((FILLET_1_R, -FILLET_1_R * 0.02), (FILLET_1_R, 0))
        make_face()
    extrude(amount=3, mode=Mode.SUBTRACT)
    with BuildSketch(Plane(origin=(21.5, 0, 3), x_dir=(0, 1, 0), z_dir=(-1, 0, 0))) as fillet_1_3_piece_5:
        with BuildLine():
            CenterArc((2.5 - FILLET_1_R, -FILLET_1_R), FILLET_1_R, 0, 90)
            Line((2.5 - FILLET_1_R, 0), (2.5 - FILLET_1_R, FILLET_1_R * 0.02))
            Line((2.5 - FILLET_1_R, FILLET_1_R * 0.02), (2.5 + FILLET_1_R * 0.02, FILLET_1_R * 0.02))
            Line((2.5 + FILLET_1_R * 0.02, FILLET_1_R * 0.02), (2.5 + FILLET_1_R * 0.02, -FILLET_1_R))
            Line((2.5 + FILLET_1_R * 0.02, -FILLET_1_R), (2.5, -FILLET_1_R))
        make_face()
    revolve(axis=Axis((21.5, 0, 3), (0, 0, -1)), revolution_arc=180, mode=Mode.SUBTRACT)
    with BuildSketch(Plane(origin=(17.5, -2.5, 1), x_dir=(-1, 0, 0), z_dir=(0, 0, 1))) as fillet_1_3_piece_6:
        with BuildLine():
            CenterArc((FILLET_1_R, -FILLET_1_R), FILLET_1_R, 90, 90)
            Line((0, -FILLET_1_R), (-FILLET_1_R * 0.02, -FILLET_1_R))
            Line((-FILLET_1_R * 0.02, -FILLET_1_R), (-FILLET_1_R * 0.02, FILLET_1_R * 0.02))
            Line((-FILLET_1_R * 0.02, FILLET_1_R * 0.02), (FILLET_1_R, FILLET_1_R * 0.02))
            Line((FILLET_1_R, FILLET_1_R * 0.02), (FILLET_1_R, 0))
        make_face()
    extrude(amount=1, mode=Mode.SUBTRACT)
    with BuildSketch(Plane(origin=(18.5, -2.5, 2), x_dir=(0, 0, 1), z_dir=(1, 0, 0))) as fillet_1_3_piece_7:
        with BuildLine():
            CenterArc((1 + FILLET_1_R, -FILLET_1_R), FILLET_1_R, 90, 90)
            Line((1 + FILLET_1_R, 0), (1 + FILLET_1_R, FILLET_1_R * 0.02))
            Line((1 + FILLET_1_R, FILLET_1_R * 0.02), (1 - FILLET_1_R * 0.02, FILLET_1_R * 0.02))
            Line((1 - FILLET_1_R * 0.02, FILLET_1_R * 0.02), (1 - FILLET_1_R * 0.02, -FILLET_1_R))
            Line((1 - FILLET_1_R * 0.02, -FILLET_1_R), (1, -FILLET_1_R))
        make_face()
    revolve(axis=Axis((18.5, -2.5, 2), (0, -1, 0)), revolution_arc=90, mode=Mode.SUBTRACT)
    with BuildSketch(Plane(origin=(18.5, 2.5, 2), x_dir=(0, 0, 1), z_dir=(1, 0, 0))) as fillet_1_3_piece_8:
        with BuildLine():
            CenterArc((1 + FILLET_1_R, FILLET_1_R), FILLET_1_R, 180, 90)
            Line((1 + FILLET_1_R, 0), (1 + FILLET_1_R, -FILLET_1_R * 0.02))
            Line((1 + FILLET_1_R, -FILLET_1_R * 0.02), (1 - FILLET_1_R * 0.02, -FILLET_1_R * 0.02))
            Line((1 - FILLET_1_R * 0.02, -FILLET_1_R * 0.02), (1 - FILLET_1_R * 0.02, FILLET_1_R))
            Line((1 - FILLET_1_R * 0.02, FILLET_1_R), (1, FILLET_1_R))
        make_face()
    revolve(axis=Axis((18.5, 2.5, 2), (0, -1, 0)), revolution_arc=90, mode=Mode.SUBTRACT)


solid = part.part
